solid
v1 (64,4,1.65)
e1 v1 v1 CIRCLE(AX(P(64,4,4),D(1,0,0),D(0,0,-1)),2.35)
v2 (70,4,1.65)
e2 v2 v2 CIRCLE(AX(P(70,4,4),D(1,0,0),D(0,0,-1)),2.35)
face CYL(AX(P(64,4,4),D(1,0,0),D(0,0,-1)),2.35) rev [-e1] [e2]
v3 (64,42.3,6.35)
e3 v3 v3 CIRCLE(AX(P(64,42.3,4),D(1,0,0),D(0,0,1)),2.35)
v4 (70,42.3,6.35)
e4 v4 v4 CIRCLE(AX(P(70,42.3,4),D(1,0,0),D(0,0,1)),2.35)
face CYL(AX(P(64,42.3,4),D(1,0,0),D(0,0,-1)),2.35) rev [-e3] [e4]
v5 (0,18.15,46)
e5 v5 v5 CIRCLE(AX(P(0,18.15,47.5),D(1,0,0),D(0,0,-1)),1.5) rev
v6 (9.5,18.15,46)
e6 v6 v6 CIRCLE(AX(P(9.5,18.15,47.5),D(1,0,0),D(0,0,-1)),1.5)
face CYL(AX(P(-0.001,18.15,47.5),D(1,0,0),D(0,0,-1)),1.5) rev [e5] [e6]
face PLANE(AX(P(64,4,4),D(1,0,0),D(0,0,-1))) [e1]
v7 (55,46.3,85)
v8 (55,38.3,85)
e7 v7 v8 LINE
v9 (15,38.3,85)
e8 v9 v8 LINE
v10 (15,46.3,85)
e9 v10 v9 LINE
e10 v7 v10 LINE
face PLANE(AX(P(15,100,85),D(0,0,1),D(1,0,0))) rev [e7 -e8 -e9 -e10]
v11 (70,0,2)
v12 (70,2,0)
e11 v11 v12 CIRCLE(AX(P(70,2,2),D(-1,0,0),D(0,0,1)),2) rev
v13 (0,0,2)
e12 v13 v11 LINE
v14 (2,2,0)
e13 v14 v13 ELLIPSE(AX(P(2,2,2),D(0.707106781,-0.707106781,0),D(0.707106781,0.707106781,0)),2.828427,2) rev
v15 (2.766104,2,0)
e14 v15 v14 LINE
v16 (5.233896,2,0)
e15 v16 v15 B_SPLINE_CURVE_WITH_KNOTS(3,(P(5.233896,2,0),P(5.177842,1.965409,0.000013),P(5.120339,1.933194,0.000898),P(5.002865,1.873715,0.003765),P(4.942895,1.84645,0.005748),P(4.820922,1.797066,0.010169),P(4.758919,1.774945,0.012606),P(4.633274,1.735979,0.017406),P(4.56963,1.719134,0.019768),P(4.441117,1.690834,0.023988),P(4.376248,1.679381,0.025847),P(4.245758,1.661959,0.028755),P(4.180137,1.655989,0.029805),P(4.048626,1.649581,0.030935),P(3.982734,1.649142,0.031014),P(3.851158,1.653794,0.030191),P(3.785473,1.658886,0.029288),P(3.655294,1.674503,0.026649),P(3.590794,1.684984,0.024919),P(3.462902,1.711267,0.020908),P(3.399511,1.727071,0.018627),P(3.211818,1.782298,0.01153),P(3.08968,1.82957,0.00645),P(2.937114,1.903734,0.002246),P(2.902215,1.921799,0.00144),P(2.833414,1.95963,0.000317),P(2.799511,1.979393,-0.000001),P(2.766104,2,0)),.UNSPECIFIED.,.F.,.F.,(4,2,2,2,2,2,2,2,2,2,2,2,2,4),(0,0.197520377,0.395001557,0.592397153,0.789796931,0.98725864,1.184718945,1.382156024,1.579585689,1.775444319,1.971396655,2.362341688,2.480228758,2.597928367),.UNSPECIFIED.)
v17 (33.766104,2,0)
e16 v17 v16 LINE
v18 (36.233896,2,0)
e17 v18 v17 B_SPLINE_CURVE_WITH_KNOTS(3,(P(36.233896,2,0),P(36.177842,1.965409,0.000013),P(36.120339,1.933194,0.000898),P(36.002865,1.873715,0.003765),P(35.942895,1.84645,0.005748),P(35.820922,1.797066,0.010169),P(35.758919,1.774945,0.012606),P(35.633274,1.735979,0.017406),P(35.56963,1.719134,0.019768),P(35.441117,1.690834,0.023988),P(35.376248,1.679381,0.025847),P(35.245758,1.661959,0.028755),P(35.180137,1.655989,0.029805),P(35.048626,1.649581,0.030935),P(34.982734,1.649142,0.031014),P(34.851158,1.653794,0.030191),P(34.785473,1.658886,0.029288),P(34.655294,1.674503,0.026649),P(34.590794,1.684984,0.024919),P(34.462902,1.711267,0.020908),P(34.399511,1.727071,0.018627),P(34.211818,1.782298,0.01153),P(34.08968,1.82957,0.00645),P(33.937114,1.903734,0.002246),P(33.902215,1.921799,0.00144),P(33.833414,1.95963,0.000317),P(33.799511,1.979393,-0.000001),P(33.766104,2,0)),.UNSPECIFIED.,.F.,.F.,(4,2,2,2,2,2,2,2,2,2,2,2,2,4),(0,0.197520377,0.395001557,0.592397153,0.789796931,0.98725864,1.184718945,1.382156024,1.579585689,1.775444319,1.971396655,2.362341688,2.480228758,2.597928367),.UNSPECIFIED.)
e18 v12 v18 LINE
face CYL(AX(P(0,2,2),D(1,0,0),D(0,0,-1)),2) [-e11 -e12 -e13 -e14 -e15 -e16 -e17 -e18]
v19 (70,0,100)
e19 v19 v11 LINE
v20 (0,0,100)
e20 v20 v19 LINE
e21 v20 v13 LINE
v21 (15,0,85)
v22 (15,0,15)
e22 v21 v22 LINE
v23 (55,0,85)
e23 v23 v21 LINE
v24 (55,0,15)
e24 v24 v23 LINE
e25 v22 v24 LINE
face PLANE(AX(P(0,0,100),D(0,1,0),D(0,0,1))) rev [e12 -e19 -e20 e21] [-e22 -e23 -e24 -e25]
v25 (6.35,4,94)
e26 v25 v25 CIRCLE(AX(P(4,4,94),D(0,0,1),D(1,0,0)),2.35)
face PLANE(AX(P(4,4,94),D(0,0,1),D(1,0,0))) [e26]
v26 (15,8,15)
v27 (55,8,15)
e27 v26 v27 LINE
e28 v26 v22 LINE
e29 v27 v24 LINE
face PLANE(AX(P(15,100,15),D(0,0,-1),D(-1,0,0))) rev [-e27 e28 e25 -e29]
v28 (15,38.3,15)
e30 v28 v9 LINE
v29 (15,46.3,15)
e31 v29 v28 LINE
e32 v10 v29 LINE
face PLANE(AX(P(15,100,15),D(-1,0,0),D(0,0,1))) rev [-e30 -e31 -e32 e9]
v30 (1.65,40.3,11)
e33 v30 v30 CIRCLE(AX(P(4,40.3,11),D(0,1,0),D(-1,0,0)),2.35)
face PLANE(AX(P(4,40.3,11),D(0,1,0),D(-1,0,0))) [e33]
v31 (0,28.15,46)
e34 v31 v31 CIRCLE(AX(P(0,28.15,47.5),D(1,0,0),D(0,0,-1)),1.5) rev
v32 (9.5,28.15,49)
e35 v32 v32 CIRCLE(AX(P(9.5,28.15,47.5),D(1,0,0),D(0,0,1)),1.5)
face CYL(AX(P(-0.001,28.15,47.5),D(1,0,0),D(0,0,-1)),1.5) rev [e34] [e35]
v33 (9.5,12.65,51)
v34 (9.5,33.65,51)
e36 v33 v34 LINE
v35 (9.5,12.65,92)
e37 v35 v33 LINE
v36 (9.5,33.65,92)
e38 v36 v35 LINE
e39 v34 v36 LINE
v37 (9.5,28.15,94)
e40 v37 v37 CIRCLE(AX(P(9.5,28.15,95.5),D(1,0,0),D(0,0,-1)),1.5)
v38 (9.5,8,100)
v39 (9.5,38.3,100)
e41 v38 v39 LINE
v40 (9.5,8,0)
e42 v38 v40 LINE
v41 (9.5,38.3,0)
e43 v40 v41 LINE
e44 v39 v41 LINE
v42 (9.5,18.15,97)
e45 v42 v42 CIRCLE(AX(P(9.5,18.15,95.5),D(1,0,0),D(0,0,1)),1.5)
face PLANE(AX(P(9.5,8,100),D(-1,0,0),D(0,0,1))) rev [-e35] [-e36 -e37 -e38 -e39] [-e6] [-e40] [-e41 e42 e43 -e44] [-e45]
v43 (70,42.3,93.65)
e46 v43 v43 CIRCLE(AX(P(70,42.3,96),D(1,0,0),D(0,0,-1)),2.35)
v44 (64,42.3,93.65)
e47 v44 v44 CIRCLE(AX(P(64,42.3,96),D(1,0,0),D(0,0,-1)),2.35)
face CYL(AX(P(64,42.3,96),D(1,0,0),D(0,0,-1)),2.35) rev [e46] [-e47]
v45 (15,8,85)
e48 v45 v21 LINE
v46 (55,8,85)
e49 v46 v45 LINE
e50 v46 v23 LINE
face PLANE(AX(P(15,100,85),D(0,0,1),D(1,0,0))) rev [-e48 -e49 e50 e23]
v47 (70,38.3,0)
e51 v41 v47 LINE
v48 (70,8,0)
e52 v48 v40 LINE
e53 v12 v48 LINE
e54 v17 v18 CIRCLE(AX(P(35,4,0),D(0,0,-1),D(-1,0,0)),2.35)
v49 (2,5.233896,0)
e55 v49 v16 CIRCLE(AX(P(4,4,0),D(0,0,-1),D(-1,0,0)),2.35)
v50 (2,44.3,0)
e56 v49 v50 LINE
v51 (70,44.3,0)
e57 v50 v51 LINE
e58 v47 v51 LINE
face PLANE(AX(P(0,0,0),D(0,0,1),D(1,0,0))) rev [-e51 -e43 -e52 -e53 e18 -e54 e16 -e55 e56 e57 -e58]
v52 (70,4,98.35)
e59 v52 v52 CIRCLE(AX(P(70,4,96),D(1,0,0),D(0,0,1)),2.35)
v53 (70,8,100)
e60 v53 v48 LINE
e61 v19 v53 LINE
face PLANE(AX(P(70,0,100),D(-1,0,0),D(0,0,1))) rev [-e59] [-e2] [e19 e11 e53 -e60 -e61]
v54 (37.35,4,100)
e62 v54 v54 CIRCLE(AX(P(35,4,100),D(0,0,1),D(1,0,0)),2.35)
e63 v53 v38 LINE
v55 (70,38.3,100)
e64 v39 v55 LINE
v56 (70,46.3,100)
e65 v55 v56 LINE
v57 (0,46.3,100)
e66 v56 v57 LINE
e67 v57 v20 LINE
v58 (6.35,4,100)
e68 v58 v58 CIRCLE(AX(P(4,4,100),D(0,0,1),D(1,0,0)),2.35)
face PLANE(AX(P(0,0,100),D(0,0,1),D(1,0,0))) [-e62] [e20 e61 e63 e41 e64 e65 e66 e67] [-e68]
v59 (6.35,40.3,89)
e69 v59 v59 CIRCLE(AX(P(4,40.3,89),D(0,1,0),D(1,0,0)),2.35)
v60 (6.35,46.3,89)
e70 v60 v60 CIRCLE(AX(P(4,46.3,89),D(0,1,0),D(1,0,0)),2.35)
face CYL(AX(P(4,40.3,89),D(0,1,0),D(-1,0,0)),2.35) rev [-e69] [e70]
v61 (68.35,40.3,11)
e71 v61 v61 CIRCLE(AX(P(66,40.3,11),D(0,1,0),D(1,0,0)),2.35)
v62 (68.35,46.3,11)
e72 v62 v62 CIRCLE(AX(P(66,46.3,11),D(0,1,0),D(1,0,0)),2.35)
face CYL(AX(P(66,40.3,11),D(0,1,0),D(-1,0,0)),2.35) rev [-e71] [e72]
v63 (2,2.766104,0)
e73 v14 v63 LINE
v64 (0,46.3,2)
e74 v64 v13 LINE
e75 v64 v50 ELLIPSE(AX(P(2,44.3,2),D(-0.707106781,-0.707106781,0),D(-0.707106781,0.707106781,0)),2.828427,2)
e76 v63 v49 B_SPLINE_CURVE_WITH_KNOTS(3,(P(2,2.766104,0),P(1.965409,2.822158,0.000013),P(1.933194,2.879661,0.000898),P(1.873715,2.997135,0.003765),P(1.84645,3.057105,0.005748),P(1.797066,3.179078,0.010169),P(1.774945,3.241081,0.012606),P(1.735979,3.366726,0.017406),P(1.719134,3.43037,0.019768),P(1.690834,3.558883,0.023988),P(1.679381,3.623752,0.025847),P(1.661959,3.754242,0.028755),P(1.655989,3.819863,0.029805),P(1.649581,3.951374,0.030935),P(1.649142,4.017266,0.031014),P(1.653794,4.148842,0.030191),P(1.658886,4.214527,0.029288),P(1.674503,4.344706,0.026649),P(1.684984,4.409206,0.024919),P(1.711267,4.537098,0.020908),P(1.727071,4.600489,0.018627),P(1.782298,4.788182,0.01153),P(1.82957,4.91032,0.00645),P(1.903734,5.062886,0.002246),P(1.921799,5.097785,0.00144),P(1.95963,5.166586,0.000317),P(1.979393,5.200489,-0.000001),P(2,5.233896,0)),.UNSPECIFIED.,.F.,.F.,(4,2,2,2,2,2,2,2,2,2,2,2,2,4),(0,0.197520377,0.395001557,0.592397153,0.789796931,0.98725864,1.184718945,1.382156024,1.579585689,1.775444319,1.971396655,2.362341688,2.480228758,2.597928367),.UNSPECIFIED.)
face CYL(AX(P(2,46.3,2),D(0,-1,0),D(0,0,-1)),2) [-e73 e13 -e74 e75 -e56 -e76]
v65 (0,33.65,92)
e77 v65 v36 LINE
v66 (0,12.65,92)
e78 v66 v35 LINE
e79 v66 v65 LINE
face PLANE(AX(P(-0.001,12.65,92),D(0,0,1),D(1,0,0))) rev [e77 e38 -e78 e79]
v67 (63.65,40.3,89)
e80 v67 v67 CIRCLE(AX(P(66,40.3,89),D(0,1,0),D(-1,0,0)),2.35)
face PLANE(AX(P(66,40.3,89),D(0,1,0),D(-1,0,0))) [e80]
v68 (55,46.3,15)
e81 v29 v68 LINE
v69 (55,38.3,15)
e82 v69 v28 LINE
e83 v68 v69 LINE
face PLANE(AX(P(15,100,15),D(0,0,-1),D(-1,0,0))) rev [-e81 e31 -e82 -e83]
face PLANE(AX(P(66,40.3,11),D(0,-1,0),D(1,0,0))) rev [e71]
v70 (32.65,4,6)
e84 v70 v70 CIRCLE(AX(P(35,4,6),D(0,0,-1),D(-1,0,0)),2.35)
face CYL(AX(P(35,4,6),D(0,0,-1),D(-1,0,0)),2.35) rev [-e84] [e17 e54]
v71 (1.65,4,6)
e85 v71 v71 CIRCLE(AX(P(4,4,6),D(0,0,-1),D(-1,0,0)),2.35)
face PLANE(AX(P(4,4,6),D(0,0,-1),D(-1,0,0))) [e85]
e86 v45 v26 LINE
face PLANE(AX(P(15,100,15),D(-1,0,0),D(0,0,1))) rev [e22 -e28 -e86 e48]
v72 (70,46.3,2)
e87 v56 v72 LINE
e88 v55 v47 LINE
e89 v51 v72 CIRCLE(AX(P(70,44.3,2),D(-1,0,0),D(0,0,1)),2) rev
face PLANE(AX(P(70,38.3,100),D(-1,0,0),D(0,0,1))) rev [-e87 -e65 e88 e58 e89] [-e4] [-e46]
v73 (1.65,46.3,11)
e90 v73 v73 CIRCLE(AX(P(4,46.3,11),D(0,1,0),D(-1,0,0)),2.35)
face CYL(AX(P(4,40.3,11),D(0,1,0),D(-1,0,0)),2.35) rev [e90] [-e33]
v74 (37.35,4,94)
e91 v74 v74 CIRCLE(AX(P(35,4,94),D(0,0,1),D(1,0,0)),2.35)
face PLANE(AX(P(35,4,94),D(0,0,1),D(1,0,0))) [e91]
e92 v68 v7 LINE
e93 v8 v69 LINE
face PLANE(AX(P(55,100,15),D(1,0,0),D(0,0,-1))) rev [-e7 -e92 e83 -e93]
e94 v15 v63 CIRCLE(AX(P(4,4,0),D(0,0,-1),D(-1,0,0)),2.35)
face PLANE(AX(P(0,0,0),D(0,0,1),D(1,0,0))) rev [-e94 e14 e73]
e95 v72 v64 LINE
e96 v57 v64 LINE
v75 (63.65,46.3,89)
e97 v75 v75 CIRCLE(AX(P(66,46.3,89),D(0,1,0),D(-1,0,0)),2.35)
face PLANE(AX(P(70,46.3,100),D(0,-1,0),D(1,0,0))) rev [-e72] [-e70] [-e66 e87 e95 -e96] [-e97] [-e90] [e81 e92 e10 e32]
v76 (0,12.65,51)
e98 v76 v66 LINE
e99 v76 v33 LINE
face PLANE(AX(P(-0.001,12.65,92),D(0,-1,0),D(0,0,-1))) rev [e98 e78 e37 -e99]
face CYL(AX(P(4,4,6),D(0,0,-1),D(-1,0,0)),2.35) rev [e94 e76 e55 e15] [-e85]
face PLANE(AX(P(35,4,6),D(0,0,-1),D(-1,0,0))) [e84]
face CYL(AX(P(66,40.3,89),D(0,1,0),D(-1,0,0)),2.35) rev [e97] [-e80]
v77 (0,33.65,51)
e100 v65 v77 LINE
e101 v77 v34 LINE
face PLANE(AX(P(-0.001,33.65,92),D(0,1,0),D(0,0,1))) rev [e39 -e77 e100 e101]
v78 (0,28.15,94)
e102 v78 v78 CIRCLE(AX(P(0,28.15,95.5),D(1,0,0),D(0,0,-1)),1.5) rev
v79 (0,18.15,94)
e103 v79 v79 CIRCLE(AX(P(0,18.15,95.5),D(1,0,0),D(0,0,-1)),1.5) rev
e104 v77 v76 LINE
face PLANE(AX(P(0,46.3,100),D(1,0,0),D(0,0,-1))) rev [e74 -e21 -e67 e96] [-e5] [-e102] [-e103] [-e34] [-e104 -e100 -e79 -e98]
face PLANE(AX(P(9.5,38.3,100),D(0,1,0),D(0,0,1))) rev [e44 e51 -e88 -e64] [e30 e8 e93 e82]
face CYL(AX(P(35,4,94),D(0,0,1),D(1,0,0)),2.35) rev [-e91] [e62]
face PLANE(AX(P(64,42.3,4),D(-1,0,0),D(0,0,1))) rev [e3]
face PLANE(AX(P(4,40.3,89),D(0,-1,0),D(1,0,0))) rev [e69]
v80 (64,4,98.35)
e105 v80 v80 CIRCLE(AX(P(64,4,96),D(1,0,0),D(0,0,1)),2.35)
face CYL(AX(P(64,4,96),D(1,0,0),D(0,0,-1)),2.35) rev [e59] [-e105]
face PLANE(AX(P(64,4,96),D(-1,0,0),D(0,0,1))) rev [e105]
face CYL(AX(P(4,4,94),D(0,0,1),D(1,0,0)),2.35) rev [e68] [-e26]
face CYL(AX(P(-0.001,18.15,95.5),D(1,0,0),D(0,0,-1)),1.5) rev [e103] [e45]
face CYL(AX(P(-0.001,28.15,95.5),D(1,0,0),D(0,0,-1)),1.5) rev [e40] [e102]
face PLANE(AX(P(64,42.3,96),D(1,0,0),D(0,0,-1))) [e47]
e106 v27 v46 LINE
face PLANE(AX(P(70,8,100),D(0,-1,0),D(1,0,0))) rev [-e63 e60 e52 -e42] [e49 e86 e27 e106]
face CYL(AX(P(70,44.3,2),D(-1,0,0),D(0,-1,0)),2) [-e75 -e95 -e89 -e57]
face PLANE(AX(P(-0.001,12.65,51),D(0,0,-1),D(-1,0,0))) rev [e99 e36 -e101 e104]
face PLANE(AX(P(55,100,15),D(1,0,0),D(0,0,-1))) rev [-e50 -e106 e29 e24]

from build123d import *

# Parameters (mm, degrees)
BOSS_EXTRUDE1_DEPTH = 100
SKETCH2_W           = 40
SKETCH2_H           = 70
CUT_EXTRUDE1_DEPTH  = 100
SKETCH3_R           = 2.35
CUT_EXTRUDE2_DEPTH  = 6
CUT_EXTRUDE3_REACH  = 127.714
SKETCH4_R           = 1.5
SKETCH4_W           = 41
SKETCH4_H           = 21
SKETCH5_R           = 2.35
CUT_EXTRUDE4_DEPTH  = 6
SKETCH6_R           = 2.35
CUT_EXTRUDE5_DEPTH  = 6
CUT_EXTRUDE6_START  = -6
SKETCH7_R           = 2.35
CUT_EXTRUDE6_DEPTH  = 6
FILLET2_R           = 2


with BuildPart() as part:
    # Sketch1 → Boss-Extrude1 (new body)
    with BuildSketch(Plane.XY):
        Polygon((0, 46.3), (0, 0), (70, 0), (70, 8), (9.5, 8), (9.5, 38.3), (70, 38.3), (70, 46.3), align=None)
    extrude(amount=BOSS_EXTRUDE1_DEPTH)

    # Sketch2 → Cut-Extrude1 (cut)
    with BuildSketch(Plane.XZ):
        with Locations((35, 50)):
            Rectangle(SKETCH2_W, SKETCH2_H)
    extrude(amount=-CUT_EXTRUDE1_DEPTH, mode=Mode.SUBTRACT)

    # Sketch3 → Cut-Extrude2 (cut)
    with BuildSketch(Plane(origin=(70, 0, 0), x_dir=(0, 0, -1), z_dir=(1, 0, 0))):
        with Locations((-96, 42.3)):
            Circle(SKETCH3_R)
        with Locations(Location((-4, 42.3, 0), (0, 0, 180))):
            Circle(SKETCH3_R)
        with Locations((-4, 4)):
            Circle(SKETCH3_R)
        with Locations(Location((-96, 4, 0), (0, 0, 180))):
            Circle(SKETCH3_R)
    extrude(amount=-CUT_EXTRUDE2_DEPTH, mode=Mode.SUBTRACT)

    # Sketch4 → Cut-Extrude3 (cut, up to next)
    with BuildSketch(Plane(origin=(9.5, 0, 0), x_dir=(0, 0, -1), z_dir=(1, 0, 0)), mode=Mode.PRIVATE) as cut_extrude3_sk1:
        with Locations((-95.5, 28.15)):
            Circle(SKETCH4_R)
    cut_extrude3_tool1 = extrude(cut_extrude3_sk1.sketch, amount=-CUT_EXTRUDE3_REACH, mode=Mode.PRIVATE) & part.part
    # Sketch4 → Cut-Extrude3 (cut, up to next)
    with BuildSketch(Plane(origin=(9.5, 0, 0), x_dir=(0, 0, -1), z_dir=(1, 0, 0)), mode=Mode.PRIVATE) as cut_extrude3_sk2:
        with Locations((-95.5, 18.15)):
            Circle(SKETCH4_R)
    cut_extrude3_tool2 = extrude(cut_extrude3_sk2.sketch, amount=-CUT_EXTRUDE3_REACH, mode=Mode.PRIVATE) & part.part
    # Sketch4 → Cut-Extrude3 (cut, up to next)
    with BuildSketch(Plane(origin=(9.5, 0, 0), x_dir=(0, 0, -1), z_dir=(1, 0, 0)), mode=Mode.PRIVATE) as cut_extrude3_sk3:
        with Locations((-47.5, 18.15)):
            Circle(SKETCH4_R)
    cut_extrude3_tool3 = extrude(cut_extrude3_sk3.sketch, amount=-CUT_EXTRUDE3_REACH, mode=Mode.PRIVATE) & part.part
    # Sketch4 → Cut-Extrude3 (cut, up to next)
    with BuildSketch(Plane(origin=(9.5, 0, 0), x_dir=(0, 0, -1), z_dir=(1, 0, 0)), mode=Mode.PRIVATE) as cut_extrude3_sk4:
        with Locations((-47.5, 28.15)):
            Circle(SKETCH4_R)
    cut_extrude3_tool4 = extrude(cut_extrude3_sk4.sketch, amount=-CUT_EXTRUDE3_REACH, mode=Mode.PRIVATE) & part.part
    # Sketch4 → Cut-Extrude3 (cut, up to next)
    with BuildSketch(Plane(origin=(9.5, 0, 0), x_dir=(0, 0, -1), z_dir=(1, 0, 0)), mode=Mode.PRIVATE) as cut_extrude3_sk5:
        with Locations((-71.5, 23.15)):
            Rectangle(SKETCH4_W, SKETCH4_H)
    cut_extrude3_tool5 = extrude(cut_extrude3_sk5.sketch, amount=-CUT_EXTRUDE3_REACH, mode=Mode.PRIVATE) & part.part
    add(cut_extrude3_tool1.solids().sort_by_distance((9.5, 28.15, 95.5))[0], mode=Mode.SUBTRACT)
    add(cut_extrude3_tool2.solids().sort_by_distance((9.5, 18.15, 95.5))[0], mode=Mode.SUBTRACT)
    add(cut_extrude3_tool3.solids().sort_by_distance((9.5, 18.15, 47.5))[0], mode=Mode.SUBTRACT)
    add(cut_extrude3_tool4.solids().sort_by_distance((9.5, 28.15, 47.5))[0], mode=Mode.SUBTRACT)
    add(cut_extrude3_tool5.solids().sort_by_distance((9.5, 23.15, 71.5))[0], mode=Mode.SUBTRACT)

    # Sketch5 → Cut-Extrude4 (cut)
    with BuildSketch(Plane(origin=(0, 46.3, 0), x_dir=(1, 0, 0), z_dir=(0, 1, 0))):
        with Locations((4, -89)):
            Circle(SKETCH5_R)
        with Locations(Location((66, -89, 0), (0, 0, 180))):
            Circle(SKETCH5_R)
        with Locations((66, -11)):
            Circle(SKETCH5_R)
        with Locations(Location((4, -11, 0), (0, 0, 180))):
            Circle(SKETCH5_R)
    extrude(amount=-CUT_EXTRUDE4_DEPTH, mode=Mode.SUBTRACT)

    # Sketch6 → Cut-Extrude5 (cut)
    with BuildSketch(Plane.XY.offset(100)):
        with Locations((4, 4)):
            Circle(SKETCH6_R)
        with Locations((35, 4)):
            Circle(SKETCH6_R)
    extrude(amount=-CUT_EXTRUDE5_DEPTH, mode=Mode.SUBTRACT)

    # Sketch7 → Cut-Extrude6 (cut)
    with BuildSketch(Plane(origin=(0, 0, 0), x_dir=(-1, 0, 0), z_dir=(0, 0, -1)).offset(CUT_EXTRUDE6_START)):
        with Locations(Location((-35, 4, 0), (0, 0, 180))):
            Circle(SKETCH7_R)
        with Locations(Location((-4, 4, 0), (0, 0, 180))):
            Circle(SKETCH7_R)
    extrude(amount=CUT_EXTRUDE6_DEPTH, mode=Mode.SUBTRACT)

    # Fillet2
    # the kernel refuses this fillet: 2 mm, written as the material it takes off along each edge
    with BuildSketch(Plane(origin=(-5, 0, 0), x_dir=(0, 1, 0), z_dir=(1, 0, 0))) as fillet2_piece_1:
        with BuildLine():
            CenterArc((FILLET2_R, FILLET2_R), FILLET2_R, 180, 90)
            Line((0, FILLET2_R), (0, 0))
            Line((0, 0), (FILLET2_R, 0))
        make_face()
    extrude(amount=80, mode=Mode.SUBTRACT)
    with BuildSketch(Plane(origin=(0, 51.3, 0), x_dir=(0, 0, 1), z_dir=(0, -1, 0))) as fillet2_piece_2:
        with BuildLine():
            CenterArc((FILLET2_R, -FILLET2_R), FILLET2_R, 90, 90)
            Line((0, -FILLET2_R), (0, 0))
            Line((0, 0), (FILLET2_R, 0))
        make_face()
    extrude(amount=56.3, mode=Mode.SUBTRACT)
    with BuildSketch(Plane(origin=(75, 46.3, 0), x_dir=(0, 0, 1), z_dir=(-1, 0, 0))) as fillet2_piece_3:
        with BuildLine():
            CenterArc((FILLET2_R, -FILLET2_R), FILLET2_R, 90, 90)
            Line((0, -FILLET2_R), (0, 0))
            Line((0, 0), (FILLET2_R, 0))
        make_face()
    extrude(amount=80, mode=Mode.SUBTRACT)


solid = part.part
